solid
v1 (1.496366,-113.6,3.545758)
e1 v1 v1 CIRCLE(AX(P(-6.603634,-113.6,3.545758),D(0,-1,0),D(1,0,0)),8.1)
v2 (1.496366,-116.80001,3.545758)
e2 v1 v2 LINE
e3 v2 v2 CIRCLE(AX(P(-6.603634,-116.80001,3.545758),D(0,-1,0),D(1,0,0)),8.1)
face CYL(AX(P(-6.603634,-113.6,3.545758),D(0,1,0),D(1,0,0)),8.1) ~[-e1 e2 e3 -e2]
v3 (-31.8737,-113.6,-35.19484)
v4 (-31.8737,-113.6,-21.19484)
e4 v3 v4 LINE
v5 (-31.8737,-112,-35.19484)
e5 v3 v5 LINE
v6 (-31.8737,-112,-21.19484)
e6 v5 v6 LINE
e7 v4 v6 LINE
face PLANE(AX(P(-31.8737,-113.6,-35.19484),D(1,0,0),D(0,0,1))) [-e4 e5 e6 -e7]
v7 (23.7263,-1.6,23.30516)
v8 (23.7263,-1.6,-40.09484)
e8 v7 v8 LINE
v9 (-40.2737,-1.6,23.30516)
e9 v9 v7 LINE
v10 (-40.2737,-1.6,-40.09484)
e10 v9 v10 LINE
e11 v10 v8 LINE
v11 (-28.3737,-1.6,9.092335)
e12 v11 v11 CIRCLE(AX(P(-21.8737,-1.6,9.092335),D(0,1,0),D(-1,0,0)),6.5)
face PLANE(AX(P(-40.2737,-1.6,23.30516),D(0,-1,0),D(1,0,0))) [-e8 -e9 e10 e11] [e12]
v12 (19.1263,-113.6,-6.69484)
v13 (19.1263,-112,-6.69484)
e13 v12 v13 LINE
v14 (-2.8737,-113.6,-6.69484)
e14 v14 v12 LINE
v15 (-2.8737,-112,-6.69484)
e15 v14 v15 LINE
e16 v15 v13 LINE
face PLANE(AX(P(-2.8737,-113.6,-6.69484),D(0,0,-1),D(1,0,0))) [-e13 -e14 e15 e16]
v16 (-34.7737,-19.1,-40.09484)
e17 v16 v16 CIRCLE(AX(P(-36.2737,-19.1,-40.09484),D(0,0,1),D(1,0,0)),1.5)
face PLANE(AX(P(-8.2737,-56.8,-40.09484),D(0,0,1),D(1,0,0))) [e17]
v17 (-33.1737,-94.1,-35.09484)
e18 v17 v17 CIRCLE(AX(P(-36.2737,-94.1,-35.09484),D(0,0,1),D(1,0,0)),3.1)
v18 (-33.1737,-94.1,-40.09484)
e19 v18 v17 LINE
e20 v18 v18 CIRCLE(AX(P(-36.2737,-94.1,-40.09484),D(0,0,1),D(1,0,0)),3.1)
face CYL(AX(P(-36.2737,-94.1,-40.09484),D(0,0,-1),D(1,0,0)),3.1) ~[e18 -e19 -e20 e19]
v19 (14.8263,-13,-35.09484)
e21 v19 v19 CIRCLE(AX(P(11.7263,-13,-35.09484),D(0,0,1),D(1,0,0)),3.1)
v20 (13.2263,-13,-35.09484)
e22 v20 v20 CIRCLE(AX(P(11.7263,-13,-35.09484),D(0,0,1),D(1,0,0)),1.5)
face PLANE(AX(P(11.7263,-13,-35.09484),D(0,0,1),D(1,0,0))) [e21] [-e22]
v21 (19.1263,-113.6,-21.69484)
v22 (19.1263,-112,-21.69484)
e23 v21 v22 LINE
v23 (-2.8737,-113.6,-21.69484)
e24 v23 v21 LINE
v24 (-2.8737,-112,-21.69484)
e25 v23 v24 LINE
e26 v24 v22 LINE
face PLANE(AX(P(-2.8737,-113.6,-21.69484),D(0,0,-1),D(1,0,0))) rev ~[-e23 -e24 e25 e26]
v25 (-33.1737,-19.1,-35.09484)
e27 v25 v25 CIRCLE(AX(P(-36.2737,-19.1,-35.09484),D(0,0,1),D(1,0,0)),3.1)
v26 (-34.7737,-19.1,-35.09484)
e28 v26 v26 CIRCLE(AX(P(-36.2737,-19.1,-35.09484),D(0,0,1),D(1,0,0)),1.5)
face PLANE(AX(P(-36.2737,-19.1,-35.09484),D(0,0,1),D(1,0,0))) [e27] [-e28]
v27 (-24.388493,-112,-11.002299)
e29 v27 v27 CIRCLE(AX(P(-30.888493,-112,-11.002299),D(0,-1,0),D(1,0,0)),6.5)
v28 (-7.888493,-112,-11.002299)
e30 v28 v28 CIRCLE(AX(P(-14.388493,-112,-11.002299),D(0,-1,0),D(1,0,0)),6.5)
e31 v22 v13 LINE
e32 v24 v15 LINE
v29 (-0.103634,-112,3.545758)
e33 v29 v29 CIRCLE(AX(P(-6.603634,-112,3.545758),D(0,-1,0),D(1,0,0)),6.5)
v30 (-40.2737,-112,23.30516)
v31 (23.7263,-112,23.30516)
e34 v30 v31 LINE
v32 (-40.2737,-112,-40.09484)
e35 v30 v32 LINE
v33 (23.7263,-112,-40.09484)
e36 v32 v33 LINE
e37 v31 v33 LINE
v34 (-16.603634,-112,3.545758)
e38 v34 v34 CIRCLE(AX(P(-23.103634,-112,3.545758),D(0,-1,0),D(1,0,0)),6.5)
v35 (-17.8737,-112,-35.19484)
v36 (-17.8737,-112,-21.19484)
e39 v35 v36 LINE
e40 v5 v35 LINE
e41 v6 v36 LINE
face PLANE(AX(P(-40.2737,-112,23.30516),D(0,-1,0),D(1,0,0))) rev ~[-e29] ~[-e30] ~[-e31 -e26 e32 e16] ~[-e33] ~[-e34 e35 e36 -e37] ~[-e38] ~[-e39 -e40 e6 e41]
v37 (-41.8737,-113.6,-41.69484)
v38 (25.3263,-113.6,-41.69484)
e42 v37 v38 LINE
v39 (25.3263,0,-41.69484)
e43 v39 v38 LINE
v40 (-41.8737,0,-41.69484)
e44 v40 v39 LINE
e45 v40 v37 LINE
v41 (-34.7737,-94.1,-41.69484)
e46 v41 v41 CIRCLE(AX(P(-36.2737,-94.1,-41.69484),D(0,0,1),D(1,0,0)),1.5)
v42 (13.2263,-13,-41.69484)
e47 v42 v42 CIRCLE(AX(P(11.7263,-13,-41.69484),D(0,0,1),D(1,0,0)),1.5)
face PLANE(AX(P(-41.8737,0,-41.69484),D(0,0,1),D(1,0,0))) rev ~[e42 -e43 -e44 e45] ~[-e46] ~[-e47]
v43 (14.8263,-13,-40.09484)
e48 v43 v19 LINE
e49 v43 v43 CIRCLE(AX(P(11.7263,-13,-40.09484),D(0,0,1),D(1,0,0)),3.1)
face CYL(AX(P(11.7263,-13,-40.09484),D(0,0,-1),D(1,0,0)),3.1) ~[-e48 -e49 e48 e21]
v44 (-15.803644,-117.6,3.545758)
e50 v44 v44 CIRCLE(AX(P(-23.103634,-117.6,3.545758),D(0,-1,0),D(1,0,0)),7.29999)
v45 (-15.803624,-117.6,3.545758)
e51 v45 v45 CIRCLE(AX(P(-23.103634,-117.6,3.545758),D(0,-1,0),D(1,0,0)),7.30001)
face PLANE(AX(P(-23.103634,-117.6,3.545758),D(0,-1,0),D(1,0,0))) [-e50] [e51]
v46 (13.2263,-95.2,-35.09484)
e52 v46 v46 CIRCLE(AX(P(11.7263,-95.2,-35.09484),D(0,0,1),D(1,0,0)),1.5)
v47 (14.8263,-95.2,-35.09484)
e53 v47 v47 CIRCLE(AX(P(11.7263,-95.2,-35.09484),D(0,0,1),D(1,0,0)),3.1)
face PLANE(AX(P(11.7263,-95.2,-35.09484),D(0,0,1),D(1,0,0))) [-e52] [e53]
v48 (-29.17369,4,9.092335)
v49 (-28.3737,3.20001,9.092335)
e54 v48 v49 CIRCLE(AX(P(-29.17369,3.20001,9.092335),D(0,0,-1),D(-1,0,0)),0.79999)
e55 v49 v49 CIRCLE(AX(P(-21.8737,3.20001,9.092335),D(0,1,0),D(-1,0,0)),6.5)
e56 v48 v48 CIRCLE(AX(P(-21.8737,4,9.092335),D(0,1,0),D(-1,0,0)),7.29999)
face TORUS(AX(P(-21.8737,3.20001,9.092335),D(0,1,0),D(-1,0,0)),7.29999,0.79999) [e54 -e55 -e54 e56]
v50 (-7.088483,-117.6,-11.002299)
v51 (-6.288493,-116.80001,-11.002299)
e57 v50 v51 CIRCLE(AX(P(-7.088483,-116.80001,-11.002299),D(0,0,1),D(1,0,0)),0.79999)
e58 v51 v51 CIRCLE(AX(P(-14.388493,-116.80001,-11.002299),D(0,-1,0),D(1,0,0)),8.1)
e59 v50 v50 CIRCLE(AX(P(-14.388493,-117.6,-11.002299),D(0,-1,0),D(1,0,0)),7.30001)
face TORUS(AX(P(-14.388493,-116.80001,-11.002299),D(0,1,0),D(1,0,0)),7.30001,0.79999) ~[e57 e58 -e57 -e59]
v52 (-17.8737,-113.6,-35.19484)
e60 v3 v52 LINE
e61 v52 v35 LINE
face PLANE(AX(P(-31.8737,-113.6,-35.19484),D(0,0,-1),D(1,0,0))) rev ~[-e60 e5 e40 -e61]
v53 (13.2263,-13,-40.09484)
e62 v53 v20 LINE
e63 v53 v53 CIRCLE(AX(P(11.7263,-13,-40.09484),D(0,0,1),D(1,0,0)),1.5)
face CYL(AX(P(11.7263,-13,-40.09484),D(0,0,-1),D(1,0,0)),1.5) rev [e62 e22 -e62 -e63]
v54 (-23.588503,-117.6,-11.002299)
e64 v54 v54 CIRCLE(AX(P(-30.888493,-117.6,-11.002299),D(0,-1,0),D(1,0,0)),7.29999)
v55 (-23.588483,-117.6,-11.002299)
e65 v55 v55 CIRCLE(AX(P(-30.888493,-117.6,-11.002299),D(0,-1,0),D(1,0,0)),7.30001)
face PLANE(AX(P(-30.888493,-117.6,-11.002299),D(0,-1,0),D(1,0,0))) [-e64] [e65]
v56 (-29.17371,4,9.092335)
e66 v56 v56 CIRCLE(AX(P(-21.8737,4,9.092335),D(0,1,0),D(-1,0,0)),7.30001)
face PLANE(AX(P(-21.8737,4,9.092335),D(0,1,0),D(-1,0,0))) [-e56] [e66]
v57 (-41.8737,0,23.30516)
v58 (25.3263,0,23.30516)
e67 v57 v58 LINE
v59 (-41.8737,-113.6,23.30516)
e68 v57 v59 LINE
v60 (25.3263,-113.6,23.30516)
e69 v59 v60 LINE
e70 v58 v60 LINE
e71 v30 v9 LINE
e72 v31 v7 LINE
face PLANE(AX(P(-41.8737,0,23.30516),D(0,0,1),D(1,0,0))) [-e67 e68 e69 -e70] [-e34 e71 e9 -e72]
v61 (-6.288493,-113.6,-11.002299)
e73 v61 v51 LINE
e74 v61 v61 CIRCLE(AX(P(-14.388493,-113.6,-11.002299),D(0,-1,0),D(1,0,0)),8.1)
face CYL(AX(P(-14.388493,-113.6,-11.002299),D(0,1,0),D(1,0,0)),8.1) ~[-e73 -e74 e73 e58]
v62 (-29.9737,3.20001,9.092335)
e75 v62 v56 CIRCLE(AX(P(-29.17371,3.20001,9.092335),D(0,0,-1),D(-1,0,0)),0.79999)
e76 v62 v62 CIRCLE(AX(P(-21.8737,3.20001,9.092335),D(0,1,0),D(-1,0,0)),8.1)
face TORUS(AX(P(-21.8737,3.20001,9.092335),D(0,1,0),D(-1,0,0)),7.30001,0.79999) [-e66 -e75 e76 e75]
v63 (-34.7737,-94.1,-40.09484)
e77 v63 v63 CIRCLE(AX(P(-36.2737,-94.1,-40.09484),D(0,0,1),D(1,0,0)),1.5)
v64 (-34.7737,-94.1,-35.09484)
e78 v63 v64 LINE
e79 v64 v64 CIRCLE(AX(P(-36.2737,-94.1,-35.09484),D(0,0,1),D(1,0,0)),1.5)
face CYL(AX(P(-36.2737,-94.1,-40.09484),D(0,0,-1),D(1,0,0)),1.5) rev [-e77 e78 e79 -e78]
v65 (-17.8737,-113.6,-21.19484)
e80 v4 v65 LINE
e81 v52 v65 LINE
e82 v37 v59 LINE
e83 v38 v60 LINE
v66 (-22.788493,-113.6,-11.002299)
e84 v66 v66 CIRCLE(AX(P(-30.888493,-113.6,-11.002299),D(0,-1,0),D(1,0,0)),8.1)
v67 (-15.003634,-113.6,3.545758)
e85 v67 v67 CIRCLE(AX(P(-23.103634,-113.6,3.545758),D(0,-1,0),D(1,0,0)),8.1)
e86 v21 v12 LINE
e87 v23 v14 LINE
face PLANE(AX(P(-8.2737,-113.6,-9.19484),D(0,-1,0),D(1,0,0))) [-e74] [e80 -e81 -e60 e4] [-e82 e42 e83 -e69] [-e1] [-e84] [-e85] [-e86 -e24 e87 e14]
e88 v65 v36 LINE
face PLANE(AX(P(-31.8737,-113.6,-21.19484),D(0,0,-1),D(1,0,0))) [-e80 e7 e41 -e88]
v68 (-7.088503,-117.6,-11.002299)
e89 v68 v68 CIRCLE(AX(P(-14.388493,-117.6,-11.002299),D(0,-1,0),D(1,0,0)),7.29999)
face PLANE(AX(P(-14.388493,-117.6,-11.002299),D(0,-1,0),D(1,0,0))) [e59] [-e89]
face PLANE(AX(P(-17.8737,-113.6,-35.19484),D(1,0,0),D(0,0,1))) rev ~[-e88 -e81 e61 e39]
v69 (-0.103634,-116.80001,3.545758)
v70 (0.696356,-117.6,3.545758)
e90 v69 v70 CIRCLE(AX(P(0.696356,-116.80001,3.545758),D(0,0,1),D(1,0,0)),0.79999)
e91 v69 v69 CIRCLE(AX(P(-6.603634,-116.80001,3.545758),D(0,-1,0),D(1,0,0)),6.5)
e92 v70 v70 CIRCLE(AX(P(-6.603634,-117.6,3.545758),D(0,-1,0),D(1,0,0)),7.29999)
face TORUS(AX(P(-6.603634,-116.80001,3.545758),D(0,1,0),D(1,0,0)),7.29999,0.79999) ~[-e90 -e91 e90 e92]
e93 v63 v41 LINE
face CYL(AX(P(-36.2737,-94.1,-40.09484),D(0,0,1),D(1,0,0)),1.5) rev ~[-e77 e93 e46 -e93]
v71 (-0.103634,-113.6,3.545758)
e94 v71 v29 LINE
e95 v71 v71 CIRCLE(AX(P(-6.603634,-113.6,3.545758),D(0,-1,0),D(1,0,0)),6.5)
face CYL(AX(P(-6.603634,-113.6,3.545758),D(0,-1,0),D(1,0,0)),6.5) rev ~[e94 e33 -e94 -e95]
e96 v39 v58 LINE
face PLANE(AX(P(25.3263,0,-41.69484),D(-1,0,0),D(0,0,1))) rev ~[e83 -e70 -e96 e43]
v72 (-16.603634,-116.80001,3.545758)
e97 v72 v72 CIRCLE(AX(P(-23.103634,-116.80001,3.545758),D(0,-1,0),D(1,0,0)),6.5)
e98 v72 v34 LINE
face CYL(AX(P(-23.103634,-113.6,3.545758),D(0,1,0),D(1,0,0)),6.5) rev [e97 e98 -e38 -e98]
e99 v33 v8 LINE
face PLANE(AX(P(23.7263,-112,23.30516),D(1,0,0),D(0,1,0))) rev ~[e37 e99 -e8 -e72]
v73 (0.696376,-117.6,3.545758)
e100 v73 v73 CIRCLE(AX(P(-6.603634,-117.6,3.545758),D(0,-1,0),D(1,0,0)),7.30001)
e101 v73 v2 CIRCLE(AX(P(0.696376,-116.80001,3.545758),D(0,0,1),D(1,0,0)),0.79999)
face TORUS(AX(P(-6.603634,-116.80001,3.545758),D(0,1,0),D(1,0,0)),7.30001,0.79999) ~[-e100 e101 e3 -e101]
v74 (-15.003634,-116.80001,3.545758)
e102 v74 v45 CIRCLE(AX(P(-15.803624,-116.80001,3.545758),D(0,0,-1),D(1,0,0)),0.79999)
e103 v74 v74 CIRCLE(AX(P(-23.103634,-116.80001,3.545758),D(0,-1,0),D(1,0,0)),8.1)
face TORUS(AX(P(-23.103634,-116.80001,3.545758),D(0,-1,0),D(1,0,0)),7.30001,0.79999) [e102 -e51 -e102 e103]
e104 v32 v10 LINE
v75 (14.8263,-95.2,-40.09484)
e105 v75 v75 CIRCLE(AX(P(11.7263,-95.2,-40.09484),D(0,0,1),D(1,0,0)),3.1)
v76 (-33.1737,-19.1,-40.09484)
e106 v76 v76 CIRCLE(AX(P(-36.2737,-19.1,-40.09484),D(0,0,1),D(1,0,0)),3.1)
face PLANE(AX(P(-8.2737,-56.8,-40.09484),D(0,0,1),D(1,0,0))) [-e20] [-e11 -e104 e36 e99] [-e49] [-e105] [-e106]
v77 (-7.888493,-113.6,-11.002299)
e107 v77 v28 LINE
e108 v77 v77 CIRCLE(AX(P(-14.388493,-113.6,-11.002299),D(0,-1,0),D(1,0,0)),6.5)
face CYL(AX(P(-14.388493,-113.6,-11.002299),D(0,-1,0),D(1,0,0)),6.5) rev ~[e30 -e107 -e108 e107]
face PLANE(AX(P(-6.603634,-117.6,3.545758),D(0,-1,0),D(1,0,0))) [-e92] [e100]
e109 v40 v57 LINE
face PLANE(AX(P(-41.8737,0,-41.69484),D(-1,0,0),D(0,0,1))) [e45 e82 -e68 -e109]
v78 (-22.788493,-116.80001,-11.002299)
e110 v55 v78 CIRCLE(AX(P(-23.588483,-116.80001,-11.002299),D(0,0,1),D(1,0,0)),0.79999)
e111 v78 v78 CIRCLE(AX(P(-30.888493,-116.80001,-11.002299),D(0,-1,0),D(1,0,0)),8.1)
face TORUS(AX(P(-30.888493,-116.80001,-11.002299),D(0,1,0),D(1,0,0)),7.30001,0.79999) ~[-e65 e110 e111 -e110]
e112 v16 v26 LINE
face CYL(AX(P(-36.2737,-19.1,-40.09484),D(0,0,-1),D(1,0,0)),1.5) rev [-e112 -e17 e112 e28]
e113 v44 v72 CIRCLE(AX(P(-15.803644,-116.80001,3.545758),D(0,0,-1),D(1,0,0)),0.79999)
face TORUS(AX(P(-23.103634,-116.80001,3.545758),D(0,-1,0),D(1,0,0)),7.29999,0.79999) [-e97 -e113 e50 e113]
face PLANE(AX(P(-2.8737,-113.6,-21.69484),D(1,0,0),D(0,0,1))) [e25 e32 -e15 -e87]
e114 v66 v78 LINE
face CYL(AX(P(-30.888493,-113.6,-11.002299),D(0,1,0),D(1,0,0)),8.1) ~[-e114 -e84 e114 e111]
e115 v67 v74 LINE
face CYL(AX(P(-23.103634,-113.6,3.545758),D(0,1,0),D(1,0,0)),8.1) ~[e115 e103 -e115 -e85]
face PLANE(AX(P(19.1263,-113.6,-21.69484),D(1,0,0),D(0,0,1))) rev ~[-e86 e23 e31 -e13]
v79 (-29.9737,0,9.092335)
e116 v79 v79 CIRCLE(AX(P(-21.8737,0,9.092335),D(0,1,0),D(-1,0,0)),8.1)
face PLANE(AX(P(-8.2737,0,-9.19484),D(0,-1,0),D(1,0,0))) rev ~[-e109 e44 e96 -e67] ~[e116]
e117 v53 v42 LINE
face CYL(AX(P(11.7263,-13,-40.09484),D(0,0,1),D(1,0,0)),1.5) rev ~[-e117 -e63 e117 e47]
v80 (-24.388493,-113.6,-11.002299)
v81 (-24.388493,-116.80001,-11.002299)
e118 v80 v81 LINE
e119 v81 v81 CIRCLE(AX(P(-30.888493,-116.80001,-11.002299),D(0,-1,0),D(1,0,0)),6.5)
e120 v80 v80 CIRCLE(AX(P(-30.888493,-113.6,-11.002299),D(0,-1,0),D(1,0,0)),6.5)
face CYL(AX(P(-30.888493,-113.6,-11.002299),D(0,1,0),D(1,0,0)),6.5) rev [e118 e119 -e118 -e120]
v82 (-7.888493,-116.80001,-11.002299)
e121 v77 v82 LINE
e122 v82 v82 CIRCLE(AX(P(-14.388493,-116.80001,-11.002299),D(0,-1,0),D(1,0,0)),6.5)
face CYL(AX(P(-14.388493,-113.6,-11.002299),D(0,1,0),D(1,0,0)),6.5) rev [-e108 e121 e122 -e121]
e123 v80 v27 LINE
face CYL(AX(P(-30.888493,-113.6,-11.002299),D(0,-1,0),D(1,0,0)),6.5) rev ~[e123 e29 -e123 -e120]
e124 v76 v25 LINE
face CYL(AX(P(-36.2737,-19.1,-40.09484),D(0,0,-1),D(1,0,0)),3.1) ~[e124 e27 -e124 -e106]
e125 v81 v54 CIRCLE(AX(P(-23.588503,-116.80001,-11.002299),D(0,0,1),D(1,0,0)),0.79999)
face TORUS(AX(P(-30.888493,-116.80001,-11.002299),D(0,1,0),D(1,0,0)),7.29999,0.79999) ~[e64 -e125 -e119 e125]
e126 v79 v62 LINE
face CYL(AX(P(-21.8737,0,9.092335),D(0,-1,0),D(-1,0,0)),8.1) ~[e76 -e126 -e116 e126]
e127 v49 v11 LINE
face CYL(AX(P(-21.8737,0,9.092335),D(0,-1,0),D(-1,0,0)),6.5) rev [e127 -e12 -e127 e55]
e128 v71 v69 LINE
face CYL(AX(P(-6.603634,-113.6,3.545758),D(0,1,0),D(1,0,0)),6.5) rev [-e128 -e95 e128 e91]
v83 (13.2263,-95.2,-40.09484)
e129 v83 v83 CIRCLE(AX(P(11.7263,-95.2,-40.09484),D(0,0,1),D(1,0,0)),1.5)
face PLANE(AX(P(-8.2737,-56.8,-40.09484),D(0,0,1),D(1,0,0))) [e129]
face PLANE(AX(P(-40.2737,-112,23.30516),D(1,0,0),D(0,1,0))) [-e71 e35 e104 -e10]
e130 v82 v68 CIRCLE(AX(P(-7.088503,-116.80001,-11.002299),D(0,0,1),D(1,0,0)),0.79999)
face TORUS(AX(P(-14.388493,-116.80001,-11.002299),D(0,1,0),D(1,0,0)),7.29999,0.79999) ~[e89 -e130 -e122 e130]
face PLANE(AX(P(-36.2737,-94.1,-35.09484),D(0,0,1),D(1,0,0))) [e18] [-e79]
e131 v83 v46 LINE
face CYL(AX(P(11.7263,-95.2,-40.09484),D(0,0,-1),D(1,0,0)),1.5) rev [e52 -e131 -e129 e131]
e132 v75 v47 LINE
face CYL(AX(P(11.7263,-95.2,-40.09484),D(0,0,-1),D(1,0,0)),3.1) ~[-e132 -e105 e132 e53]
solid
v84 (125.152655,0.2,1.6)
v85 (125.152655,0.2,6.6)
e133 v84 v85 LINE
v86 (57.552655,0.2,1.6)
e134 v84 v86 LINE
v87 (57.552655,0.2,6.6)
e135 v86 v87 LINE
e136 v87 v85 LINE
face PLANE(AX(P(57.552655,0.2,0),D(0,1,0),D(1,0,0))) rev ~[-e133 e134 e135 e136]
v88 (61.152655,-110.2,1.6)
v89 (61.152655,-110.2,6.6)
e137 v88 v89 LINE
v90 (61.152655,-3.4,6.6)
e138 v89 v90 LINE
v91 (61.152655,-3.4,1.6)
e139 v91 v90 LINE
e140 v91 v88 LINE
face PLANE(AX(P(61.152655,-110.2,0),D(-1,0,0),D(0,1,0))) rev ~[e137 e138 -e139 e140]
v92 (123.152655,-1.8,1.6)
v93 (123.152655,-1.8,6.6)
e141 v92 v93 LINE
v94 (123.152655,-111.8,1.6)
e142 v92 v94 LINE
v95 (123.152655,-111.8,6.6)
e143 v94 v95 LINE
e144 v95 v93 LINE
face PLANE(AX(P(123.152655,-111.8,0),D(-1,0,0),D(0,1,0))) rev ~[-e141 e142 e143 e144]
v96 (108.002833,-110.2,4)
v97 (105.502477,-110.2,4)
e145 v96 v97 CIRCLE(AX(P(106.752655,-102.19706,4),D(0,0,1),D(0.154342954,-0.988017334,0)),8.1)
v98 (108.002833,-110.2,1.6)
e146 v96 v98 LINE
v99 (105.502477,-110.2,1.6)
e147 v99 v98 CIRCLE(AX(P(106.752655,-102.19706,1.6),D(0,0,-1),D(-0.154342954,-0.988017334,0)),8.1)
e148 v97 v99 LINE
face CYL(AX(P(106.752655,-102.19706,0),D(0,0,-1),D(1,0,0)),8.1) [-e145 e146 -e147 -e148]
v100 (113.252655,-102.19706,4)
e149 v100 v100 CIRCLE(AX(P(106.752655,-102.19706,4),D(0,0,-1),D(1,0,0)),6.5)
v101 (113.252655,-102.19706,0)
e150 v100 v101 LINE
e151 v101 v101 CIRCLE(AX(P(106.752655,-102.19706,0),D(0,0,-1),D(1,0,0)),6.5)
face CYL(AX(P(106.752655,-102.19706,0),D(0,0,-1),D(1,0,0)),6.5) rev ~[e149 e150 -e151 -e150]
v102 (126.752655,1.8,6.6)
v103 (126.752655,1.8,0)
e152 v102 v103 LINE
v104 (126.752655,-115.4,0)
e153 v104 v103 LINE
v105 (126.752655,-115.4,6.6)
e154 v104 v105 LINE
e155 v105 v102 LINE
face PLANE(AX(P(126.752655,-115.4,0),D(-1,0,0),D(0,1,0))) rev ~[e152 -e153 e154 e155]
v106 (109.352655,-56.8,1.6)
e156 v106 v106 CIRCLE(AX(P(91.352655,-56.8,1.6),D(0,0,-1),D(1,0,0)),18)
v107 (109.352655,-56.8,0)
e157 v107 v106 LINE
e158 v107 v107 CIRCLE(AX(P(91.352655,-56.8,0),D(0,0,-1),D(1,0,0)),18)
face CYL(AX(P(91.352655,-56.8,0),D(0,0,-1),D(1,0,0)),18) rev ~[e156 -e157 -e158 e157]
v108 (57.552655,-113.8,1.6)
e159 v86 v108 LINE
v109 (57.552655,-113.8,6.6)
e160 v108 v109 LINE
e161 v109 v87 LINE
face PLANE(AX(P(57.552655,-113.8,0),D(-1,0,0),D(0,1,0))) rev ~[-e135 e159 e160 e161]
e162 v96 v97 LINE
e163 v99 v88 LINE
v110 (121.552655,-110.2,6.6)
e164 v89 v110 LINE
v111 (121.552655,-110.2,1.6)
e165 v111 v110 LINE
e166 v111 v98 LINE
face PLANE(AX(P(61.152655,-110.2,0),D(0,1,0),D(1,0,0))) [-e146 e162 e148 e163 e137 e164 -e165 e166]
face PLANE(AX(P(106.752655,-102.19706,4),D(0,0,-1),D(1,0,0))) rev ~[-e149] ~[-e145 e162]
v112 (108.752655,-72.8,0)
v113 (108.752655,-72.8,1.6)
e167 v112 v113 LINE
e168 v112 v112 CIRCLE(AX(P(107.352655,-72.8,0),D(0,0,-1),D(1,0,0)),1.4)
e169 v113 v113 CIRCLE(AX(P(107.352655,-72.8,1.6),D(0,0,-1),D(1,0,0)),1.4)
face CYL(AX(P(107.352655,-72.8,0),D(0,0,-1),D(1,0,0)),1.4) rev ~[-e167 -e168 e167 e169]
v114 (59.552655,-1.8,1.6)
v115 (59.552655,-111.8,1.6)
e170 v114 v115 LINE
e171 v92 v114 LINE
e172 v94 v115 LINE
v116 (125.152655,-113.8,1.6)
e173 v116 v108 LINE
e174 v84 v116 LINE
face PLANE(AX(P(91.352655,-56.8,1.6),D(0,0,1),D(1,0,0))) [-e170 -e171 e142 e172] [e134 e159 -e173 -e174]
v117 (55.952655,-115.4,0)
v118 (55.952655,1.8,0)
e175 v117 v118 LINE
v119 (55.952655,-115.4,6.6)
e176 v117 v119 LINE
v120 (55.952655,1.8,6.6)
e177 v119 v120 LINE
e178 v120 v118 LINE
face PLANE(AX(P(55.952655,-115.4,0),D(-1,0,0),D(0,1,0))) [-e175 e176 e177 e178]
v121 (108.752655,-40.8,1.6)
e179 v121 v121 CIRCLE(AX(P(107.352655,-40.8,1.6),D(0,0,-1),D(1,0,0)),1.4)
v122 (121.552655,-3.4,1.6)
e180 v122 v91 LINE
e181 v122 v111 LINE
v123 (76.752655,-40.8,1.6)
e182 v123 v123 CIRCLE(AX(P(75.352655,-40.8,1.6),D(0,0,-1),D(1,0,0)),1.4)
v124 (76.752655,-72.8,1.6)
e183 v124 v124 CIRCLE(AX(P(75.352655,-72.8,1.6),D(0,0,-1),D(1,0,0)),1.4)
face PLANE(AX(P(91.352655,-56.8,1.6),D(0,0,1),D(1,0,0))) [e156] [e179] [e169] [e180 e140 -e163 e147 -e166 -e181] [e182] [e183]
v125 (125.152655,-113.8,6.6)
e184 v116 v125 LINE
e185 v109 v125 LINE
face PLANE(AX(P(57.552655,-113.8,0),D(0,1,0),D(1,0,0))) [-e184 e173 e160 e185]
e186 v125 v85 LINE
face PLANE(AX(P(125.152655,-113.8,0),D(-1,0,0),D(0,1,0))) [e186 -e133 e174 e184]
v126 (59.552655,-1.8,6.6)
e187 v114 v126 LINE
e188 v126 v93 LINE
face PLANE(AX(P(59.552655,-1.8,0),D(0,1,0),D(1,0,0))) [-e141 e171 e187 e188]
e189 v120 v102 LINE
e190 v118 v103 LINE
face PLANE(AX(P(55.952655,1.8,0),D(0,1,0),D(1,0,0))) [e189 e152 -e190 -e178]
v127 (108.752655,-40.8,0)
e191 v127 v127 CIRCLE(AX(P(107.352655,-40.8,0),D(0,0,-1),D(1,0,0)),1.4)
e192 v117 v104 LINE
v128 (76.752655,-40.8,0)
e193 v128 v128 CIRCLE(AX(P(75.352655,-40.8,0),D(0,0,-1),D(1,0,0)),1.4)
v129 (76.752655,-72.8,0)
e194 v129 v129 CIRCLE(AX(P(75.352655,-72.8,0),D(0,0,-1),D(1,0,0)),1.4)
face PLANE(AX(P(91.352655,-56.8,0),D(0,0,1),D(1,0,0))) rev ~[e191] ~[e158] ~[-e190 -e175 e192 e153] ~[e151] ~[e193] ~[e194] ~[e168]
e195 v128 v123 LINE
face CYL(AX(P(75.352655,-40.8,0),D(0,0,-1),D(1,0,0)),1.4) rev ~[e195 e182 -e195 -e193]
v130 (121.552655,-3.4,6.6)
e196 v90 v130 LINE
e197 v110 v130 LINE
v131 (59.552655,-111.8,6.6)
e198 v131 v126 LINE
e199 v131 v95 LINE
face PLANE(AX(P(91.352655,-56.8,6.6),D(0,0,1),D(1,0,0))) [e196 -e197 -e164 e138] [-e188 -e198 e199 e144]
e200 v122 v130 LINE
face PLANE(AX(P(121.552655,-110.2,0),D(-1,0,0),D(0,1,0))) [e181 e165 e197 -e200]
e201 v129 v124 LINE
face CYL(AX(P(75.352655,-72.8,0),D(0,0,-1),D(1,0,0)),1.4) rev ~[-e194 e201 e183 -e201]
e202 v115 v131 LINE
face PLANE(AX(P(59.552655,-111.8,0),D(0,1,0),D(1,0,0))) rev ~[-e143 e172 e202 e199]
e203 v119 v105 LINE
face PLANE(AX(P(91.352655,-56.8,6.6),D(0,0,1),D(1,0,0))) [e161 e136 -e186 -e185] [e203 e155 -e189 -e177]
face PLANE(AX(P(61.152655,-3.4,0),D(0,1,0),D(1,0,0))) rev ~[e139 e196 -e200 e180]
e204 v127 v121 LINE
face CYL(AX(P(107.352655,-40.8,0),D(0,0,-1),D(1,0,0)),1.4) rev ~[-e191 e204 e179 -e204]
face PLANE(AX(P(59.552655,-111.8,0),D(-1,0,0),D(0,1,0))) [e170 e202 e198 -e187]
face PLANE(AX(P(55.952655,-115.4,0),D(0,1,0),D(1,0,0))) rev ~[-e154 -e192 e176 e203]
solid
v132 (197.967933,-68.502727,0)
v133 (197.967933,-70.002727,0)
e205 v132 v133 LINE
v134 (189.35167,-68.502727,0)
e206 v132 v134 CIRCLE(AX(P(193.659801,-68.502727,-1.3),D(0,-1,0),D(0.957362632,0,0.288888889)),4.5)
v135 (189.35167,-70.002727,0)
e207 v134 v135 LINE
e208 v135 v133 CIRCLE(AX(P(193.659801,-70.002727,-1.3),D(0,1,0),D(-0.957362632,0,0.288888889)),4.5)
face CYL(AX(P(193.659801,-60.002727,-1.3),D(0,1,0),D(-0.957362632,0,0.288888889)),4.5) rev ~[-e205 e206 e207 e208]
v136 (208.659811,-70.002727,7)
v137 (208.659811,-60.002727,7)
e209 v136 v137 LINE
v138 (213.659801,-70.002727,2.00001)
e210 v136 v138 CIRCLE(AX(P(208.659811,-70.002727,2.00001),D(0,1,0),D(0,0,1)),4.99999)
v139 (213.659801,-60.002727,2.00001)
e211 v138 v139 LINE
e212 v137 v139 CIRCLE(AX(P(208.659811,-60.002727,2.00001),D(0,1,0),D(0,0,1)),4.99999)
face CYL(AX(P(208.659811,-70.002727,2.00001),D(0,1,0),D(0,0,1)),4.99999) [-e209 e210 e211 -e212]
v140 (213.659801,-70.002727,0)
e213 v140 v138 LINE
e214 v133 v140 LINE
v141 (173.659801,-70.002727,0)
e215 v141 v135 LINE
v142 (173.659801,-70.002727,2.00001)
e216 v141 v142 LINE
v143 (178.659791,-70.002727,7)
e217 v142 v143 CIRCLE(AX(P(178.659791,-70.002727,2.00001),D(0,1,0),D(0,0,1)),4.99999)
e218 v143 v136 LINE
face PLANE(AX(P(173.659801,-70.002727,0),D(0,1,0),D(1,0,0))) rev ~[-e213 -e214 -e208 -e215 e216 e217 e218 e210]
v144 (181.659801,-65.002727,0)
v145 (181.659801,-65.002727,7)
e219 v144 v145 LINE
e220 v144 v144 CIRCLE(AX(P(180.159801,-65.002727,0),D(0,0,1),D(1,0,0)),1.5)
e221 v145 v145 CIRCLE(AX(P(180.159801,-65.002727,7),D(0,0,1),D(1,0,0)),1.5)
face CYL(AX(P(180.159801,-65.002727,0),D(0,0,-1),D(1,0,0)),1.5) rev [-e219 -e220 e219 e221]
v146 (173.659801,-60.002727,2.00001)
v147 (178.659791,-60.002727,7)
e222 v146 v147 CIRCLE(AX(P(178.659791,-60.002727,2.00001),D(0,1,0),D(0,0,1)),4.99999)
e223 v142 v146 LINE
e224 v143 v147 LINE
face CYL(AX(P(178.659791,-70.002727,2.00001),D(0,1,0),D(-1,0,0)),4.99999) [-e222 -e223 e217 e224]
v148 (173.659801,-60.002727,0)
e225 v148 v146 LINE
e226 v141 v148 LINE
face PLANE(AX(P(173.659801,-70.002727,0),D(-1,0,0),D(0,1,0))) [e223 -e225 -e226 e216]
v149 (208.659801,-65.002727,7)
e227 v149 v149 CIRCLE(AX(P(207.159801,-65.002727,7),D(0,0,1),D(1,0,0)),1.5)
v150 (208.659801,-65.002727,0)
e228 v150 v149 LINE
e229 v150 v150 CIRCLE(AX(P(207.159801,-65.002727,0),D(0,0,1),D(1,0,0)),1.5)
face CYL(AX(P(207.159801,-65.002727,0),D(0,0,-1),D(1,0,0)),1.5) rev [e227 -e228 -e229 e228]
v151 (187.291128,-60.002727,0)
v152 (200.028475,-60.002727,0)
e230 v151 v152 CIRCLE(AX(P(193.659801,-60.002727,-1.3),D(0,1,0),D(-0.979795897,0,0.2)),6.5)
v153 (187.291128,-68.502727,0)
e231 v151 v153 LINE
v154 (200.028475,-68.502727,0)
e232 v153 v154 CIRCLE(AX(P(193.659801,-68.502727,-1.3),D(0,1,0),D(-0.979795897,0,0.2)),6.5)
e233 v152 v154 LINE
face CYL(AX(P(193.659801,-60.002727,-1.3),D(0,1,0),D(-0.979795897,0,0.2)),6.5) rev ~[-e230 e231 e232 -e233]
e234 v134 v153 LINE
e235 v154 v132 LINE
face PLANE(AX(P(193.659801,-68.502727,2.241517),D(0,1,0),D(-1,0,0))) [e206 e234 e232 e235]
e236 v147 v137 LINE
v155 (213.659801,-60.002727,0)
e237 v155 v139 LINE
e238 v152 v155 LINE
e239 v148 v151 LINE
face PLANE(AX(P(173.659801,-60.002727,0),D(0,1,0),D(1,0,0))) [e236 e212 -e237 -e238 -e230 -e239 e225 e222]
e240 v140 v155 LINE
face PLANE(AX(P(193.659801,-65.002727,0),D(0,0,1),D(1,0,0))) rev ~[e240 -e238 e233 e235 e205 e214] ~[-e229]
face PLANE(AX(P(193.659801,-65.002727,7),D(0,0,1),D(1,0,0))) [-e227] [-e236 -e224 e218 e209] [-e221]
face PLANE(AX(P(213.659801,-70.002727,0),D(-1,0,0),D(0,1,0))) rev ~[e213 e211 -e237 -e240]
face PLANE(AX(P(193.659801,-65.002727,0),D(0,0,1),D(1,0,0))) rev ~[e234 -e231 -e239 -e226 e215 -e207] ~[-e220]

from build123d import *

# Parameters (mm, degrees)
F1_W      = 67.2
F1_H      = 65
F2_DEPTH  = 113.6
F3_W      = 64
F3_H      = 110.4
F4_DEPTH  = 63.4
F5_W      = 22
F5_H      = 15
F5_W_2    = 14
F5_H_2    = 14
F5_R      = 6.5
F6_DEPTH  = 1.6
F5_R_2    = 8.1
F7_DEPTH  = 4
F8_R      = 0.79999
F9_R      = 6.5
F10_DEPTH = 1.6
F11_R     = 3.1
F11_R_2   = 1.5
F12_DEPTH = 5
F13_DEPTH = 1.6
F9_R_2    = 8.1
F14_DEPTH = 4
F15_R     = 0.79999
F16_W     = 70.8
F16_H     = 117.2
F16_W_2   = 67.6
F16_H_2   = 114
F16_W_3   = 63.6
F16_H_3   = 110
F16_W_4   = 60.4
F16_H_4   = 106.8
F17_DEPTH = 1.6
F18_DEPTH = 6.6
F19_R     = 18
F19_R_2   = 1.4
F19_R_3   = 6.5
F20_DEPTH = 1.6
F21_R     = 8.1
F21_R_2   = 6.5
F22_DEPTH = 4
F23_W     = 40
F23_H     = 10
F23_R     = 1.5
F24_DEPTH = 7
F26_DEPTH = 10
F27_DEPTH = 8.5
F28_R     = 4.99999


# Not quite as in the source:
# - a fillet or chamfer is up to 0.001 mm smaller than in the source, because OpenCascade refuses the exact size


with BuildPart() as f2:
    # F1 (on Front) → F2 (new body)
    with BuildSketch(Plane.XZ):
        with Locations((-8.273699697, -9.1948397458)):
            Rectangle(F1_W, F1_H)
    extrude(amount=F2_DEPTH)

    # F3 (on face) → F4 (cut)
    with BuildSketch(Plane.XY.offset(23.3051602542)):
        with Locations((-8.273699697, -56.8)):
            Rectangle(F3_W, F3_H)
    extrude(amount=-F4_DEPTH, mode=Mode.SUBTRACT)

    # F5 (on face) → F6 (cut, through all)
    with BuildSketch(Plane.XZ.offset(113.6)):
        with Locations((8.126300303, -14.1948397458)):
            Rectangle(F5_W, F5_H)
        with Locations((-24.873699697, -28.1948397458)):
            Rectangle(F5_W_2, F5_H_2)
        with Locations((-14.3884929258, -11.0022990834)):
            Circle(F5_R)
        with Locations((-6.6036338955, 3.545758171)):
            Circle(F5_R)
        with Locations((-23.1036338955, 3.545758171)):
            Circle(F5_R)
        with Locations((-30.8884929258, -11.0022990834)):
            Circle(F5_R)
    extrude(amount=-F6_DEPTH, mode=Mode.SUBTRACT)

    # F5 (on face) → F7 (join)
    with BuildSketch(Plane.XZ.offset(113.6)):
        with Locations((-23.1036338955, 3.545758171)):
            Circle(F5_R_2)
        with Locations((-23.1036338955, 3.545758171)):
            Circle(F5_R, mode=Mode.SUBTRACT)
        with Locations((-6.6036338955, 3.545758171)):
            Circle(F5_R_2)
        with Locations((-6.6036338955, 3.545758171)):
            Circle(F5_R, mode=Mode.SUBTRACT)
        with Locations((-14.3884929258, -11.0022990834)):
            Circle(F5_R_2)
        with Locations((-14.3884929258, -11.0022990834)):
            Circle(F5_R, mode=Mode.SUBTRACT)
        with Locations((-30.8884929258, -11.0022990834)):
            Circle(F5_R_2)
        with Locations((-30.8884929258, -11.0022990834)):
            Circle(F5_R, mode=Mode.SUBTRACT)
    extrude(amount=F7_DEPTH)

    # F8 (radius 0.8 in the source; OpenCascade refuses exactly that, so slightly less here)
    f8_edges = [f2.edges().sort_by_distance(p)[0] for p in [
        (-38.988493, -117.6, -11.002299),
        (-37.388493, -117.6, -11.002299),
        (-31.203634, -117.6, 3.545758),
        (-29.603634, -117.6, 3.545758),
        (-14.703634, -117.6, 3.545758),
        (-13.103634, -117.6, 3.545758),
        (-22.488493, -117.6, -11.002299),
        (-20.888493, -117.6, -11.002299),
    ]]
    fillet(f8_edges, radius=F8_R)

    # F9 (on face) → F10 (cut, through all)
    with BuildSketch(Plane(origin=(0, 0, 0), x_dir=(-1, 0, 0), z_dir=(0, 1, 0))):
        with Locations((21.873699697, 9.0923350961)):
            Circle(F9_R)
    extrude(amount=-F10_DEPTH, mode=Mode.SUBTRACT)

    # F11 (on face) → F12 (join)
    with BuildSketch(Plane.XY.offset(-40.0948397458)):
        with Locations((-36.273699697, -94.1)):
            Circle(F11_R)
        with Locations((-36.273699697, -94.1)):
            Circle(F11_R_2, mode=Mode.SUBTRACT)
        with Locations((11.726300303, -95.2)):
            Circle(F11_R)
        with Locations((11.726300303, -95.2)):
            Circle(F11_R_2, mode=Mode.SUBTRACT)
        with Locations((-36.273699697, -19.1)):
            Circle(F11_R)
        with Locations((-36.273699697, -19.1)):
            Circle(F11_R_2, mode=Mode.SUBTRACT)
        with Locations((11.726300303, -13)):
            Circle(F11_R)
        with Locations((11.726300303, -13)):
            Circle(F11_R_2, mode=Mode.SUBTRACT)
    extrude(amount=F12_DEPTH)

    # F13 (cut, through all): faces of the model
    f13_faces = [f2.faces().sort_by_distance(p)[0] for p in [
        (-36.273699697, -94.1, -40.0948397458),
        (11.726300303, -13, -40.0948397458),
    ]]
    extrude(f13_faces, amount=-F13_DEPTH, mode=Mode.SUBTRACT)

    # F9 (on face) → F14 (join)
    with BuildSketch(Plane(origin=(0, 0, 0), x_dir=(-1, 0, 0), z_dir=(0, 1, 0))):
        with Locations((21.873699697, 9.0923350961)):
            Circle(F9_R_2)
        with Locations((21.873699697, 9.0923350961)):
            Circle(F9_R, mode=Mode.SUBTRACT)
    extrude(amount=F14_DEPTH)

    # F15 (radius 0.8 in the source; OpenCascade refuses exactly that, so slightly less here)
    f15_edges = [f2.edges().sort_by_distance(p)[0] for p in [
        (-13.7737, 4, 9.092335),
        (-15.3737, 4, 9.092335),
    ]]
    fillet(f15_edges, radius=F15_R)


with BuildPart() as f17:
    # F16 (on Top) → F17 (new body)
    with BuildSketch(Plane.XY):
        with Locations((91.3526551749, -56.8)):
            Rectangle(F16_W, F16_H)
        with Locations((91.3526551749, -56.8)):
            Rectangle(F16_W_2, F16_H_2, mode=Mode.SUBTRACT)
        with Locations((91.3526551749, -56.8)):
            Rectangle(F16_W_2, F16_H_2)
        with Locations((91.3526551749, -56.8)):
            Rectangle(F16_W_3, F16_H_3, mode=Mode.SUBTRACT)
        with Locations((91.3526551749, -56.8)):
            Rectangle(F16_W_3, F16_H_3)
        with Locations((91.3526551749, -56.8)):
            Rectangle(F16_W_4, F16_H_4, mode=Mode.SUBTRACT)
        with Locations((91.3526551749, -56.8)):
            Rectangle(F16_W_4, F16_H_4)
    extrude(amount=F17_DEPTH)

    # F16 (on Top) → F18 (join)
    with BuildSketch(Plane.XY):
        with Locations((91.3526551749, -56.8)):
            Rectangle(F16_W, F16_H)
        with Locations((91.3526551749, -56.8)):
            Rectangle(F16_W_2, F16_H_2, mode=Mode.SUBTRACT)
        with Locations((91.3526551749, -56.8)):
            Rectangle(F16_W_3, F16_H_3)
        with Locations((91.3526551749, -56.8)):
            Rectangle(F16_W_4, F16_H_4, mode=Mode.SUBTRACT)
    extrude(amount=F18_DEPTH)

    # F19 (on face) → F20 (cut, through all)
    with BuildSketch(Plane(origin=(0, 0, 0), x_dir=(1, 0, 0), z_dir=(0, 0, -1))):
        with Locations((91.3526551749, 56.8)):
            Circle(F19_R)
        with Locations((75.3526551749, 72.8)):
            Circle(F19_R_2)
        with Locations((75.3526551749, 40.8)):
            Circle(F19_R_2)
        with Locations((107.3526551749, 40.8)):
            Circle(F19_R_2)
        with Locations((107.3526551749, 72.8)):
            Circle(F19_R_2)
        with Locations((106.7526551749, 102.197059594)):
            Circle(F19_R_3)
    extrude(amount=-F20_DEPTH, mode=Mode.SUBTRACT)

    # F21 (on face) → F22 (join)
    with BuildSketch(Plane(origin=(0, 0, 0), x_dir=(1, 0, 0), z_dir=(0, 0, -1))):
        with Locations((106.7526551749, 102.197059594)):
            Circle(F21_R)
        with Locations((106.7526551749, 102.197059594)):
            Circle(F21_R_2, mode=Mode.SUBTRACT)
    extrude(amount=-F22_DEPTH)


with BuildPart() as f24:
    # F23 (on Top) → F24 (new body)
    with BuildSketch(Plane.XY):
        with Locations((193.6598014832, -65.0027272105)):
            Rectangle(F23_W, F23_H)
        with Locations((180.1598014832, -65.0027272105)):
            Circle(F23_R, mode=Mode.SUBTRACT)
        with Locations((207.1598014832, -65.0027272105)):
            Circle(F23_R, mode=Mode.SUBTRACT)
    extrude(amount=F24_DEPTH)

    # F25 (on face) → F26 (cut, through all)
    with BuildSketch(Plane(origin=(0, -60.0027272105, 0), x_dir=(-1, 0, 0), z_dir=(0, 1, 0))):
        with BuildLine():
            Line((-197.9679333289, 0), (-189.3516696374, 0))
            ThreePointArc((-189.3516696374, 0), (-193.6598014832, 3.2), (-197.9679333289, 0))
        make_face()
    extrude(amount=-F26_DEPTH, mode=Mode.SUBTRACT)

    # F25 (on face) → F27 (cut)
    with BuildSketch(Plane(origin=(0, -60.0027272105, 0), x_dir=(-1, 0, 0), z_dir=(0, 1, 0))):
        with BuildLine():
            Line((-189.3516696374, 0), (-187.2911281519, 0))
            ThreePointArc((-187.2911281519, 0), (-193.6598014832, 5.2), (-200.0284748144, 0))
            Line((-200.0284748144, 0), (-197.9679333289, 0))
            ThreePointArc((-197.9679333289, 0), (-193.6598014832, 3.2), (-189.3516696374, 0))
        make_face()
    extrude(amount=-F27_DEPTH, mode=Mode.SUBTRACT)

    # F28 (radius 5 in the source; OpenCascade refuses exactly that, so slightly less here)
    f28_edges = [f24.edges().sort_by_distance(p)[0] for p in [
        (213.659801, -65.002727, 7),
        (173.659801, -65.002727, 7),
    ]]
    fillet(f28_edges, radius=F28_R)


solid = Compound([f2.part, f17.part, f24.part])
